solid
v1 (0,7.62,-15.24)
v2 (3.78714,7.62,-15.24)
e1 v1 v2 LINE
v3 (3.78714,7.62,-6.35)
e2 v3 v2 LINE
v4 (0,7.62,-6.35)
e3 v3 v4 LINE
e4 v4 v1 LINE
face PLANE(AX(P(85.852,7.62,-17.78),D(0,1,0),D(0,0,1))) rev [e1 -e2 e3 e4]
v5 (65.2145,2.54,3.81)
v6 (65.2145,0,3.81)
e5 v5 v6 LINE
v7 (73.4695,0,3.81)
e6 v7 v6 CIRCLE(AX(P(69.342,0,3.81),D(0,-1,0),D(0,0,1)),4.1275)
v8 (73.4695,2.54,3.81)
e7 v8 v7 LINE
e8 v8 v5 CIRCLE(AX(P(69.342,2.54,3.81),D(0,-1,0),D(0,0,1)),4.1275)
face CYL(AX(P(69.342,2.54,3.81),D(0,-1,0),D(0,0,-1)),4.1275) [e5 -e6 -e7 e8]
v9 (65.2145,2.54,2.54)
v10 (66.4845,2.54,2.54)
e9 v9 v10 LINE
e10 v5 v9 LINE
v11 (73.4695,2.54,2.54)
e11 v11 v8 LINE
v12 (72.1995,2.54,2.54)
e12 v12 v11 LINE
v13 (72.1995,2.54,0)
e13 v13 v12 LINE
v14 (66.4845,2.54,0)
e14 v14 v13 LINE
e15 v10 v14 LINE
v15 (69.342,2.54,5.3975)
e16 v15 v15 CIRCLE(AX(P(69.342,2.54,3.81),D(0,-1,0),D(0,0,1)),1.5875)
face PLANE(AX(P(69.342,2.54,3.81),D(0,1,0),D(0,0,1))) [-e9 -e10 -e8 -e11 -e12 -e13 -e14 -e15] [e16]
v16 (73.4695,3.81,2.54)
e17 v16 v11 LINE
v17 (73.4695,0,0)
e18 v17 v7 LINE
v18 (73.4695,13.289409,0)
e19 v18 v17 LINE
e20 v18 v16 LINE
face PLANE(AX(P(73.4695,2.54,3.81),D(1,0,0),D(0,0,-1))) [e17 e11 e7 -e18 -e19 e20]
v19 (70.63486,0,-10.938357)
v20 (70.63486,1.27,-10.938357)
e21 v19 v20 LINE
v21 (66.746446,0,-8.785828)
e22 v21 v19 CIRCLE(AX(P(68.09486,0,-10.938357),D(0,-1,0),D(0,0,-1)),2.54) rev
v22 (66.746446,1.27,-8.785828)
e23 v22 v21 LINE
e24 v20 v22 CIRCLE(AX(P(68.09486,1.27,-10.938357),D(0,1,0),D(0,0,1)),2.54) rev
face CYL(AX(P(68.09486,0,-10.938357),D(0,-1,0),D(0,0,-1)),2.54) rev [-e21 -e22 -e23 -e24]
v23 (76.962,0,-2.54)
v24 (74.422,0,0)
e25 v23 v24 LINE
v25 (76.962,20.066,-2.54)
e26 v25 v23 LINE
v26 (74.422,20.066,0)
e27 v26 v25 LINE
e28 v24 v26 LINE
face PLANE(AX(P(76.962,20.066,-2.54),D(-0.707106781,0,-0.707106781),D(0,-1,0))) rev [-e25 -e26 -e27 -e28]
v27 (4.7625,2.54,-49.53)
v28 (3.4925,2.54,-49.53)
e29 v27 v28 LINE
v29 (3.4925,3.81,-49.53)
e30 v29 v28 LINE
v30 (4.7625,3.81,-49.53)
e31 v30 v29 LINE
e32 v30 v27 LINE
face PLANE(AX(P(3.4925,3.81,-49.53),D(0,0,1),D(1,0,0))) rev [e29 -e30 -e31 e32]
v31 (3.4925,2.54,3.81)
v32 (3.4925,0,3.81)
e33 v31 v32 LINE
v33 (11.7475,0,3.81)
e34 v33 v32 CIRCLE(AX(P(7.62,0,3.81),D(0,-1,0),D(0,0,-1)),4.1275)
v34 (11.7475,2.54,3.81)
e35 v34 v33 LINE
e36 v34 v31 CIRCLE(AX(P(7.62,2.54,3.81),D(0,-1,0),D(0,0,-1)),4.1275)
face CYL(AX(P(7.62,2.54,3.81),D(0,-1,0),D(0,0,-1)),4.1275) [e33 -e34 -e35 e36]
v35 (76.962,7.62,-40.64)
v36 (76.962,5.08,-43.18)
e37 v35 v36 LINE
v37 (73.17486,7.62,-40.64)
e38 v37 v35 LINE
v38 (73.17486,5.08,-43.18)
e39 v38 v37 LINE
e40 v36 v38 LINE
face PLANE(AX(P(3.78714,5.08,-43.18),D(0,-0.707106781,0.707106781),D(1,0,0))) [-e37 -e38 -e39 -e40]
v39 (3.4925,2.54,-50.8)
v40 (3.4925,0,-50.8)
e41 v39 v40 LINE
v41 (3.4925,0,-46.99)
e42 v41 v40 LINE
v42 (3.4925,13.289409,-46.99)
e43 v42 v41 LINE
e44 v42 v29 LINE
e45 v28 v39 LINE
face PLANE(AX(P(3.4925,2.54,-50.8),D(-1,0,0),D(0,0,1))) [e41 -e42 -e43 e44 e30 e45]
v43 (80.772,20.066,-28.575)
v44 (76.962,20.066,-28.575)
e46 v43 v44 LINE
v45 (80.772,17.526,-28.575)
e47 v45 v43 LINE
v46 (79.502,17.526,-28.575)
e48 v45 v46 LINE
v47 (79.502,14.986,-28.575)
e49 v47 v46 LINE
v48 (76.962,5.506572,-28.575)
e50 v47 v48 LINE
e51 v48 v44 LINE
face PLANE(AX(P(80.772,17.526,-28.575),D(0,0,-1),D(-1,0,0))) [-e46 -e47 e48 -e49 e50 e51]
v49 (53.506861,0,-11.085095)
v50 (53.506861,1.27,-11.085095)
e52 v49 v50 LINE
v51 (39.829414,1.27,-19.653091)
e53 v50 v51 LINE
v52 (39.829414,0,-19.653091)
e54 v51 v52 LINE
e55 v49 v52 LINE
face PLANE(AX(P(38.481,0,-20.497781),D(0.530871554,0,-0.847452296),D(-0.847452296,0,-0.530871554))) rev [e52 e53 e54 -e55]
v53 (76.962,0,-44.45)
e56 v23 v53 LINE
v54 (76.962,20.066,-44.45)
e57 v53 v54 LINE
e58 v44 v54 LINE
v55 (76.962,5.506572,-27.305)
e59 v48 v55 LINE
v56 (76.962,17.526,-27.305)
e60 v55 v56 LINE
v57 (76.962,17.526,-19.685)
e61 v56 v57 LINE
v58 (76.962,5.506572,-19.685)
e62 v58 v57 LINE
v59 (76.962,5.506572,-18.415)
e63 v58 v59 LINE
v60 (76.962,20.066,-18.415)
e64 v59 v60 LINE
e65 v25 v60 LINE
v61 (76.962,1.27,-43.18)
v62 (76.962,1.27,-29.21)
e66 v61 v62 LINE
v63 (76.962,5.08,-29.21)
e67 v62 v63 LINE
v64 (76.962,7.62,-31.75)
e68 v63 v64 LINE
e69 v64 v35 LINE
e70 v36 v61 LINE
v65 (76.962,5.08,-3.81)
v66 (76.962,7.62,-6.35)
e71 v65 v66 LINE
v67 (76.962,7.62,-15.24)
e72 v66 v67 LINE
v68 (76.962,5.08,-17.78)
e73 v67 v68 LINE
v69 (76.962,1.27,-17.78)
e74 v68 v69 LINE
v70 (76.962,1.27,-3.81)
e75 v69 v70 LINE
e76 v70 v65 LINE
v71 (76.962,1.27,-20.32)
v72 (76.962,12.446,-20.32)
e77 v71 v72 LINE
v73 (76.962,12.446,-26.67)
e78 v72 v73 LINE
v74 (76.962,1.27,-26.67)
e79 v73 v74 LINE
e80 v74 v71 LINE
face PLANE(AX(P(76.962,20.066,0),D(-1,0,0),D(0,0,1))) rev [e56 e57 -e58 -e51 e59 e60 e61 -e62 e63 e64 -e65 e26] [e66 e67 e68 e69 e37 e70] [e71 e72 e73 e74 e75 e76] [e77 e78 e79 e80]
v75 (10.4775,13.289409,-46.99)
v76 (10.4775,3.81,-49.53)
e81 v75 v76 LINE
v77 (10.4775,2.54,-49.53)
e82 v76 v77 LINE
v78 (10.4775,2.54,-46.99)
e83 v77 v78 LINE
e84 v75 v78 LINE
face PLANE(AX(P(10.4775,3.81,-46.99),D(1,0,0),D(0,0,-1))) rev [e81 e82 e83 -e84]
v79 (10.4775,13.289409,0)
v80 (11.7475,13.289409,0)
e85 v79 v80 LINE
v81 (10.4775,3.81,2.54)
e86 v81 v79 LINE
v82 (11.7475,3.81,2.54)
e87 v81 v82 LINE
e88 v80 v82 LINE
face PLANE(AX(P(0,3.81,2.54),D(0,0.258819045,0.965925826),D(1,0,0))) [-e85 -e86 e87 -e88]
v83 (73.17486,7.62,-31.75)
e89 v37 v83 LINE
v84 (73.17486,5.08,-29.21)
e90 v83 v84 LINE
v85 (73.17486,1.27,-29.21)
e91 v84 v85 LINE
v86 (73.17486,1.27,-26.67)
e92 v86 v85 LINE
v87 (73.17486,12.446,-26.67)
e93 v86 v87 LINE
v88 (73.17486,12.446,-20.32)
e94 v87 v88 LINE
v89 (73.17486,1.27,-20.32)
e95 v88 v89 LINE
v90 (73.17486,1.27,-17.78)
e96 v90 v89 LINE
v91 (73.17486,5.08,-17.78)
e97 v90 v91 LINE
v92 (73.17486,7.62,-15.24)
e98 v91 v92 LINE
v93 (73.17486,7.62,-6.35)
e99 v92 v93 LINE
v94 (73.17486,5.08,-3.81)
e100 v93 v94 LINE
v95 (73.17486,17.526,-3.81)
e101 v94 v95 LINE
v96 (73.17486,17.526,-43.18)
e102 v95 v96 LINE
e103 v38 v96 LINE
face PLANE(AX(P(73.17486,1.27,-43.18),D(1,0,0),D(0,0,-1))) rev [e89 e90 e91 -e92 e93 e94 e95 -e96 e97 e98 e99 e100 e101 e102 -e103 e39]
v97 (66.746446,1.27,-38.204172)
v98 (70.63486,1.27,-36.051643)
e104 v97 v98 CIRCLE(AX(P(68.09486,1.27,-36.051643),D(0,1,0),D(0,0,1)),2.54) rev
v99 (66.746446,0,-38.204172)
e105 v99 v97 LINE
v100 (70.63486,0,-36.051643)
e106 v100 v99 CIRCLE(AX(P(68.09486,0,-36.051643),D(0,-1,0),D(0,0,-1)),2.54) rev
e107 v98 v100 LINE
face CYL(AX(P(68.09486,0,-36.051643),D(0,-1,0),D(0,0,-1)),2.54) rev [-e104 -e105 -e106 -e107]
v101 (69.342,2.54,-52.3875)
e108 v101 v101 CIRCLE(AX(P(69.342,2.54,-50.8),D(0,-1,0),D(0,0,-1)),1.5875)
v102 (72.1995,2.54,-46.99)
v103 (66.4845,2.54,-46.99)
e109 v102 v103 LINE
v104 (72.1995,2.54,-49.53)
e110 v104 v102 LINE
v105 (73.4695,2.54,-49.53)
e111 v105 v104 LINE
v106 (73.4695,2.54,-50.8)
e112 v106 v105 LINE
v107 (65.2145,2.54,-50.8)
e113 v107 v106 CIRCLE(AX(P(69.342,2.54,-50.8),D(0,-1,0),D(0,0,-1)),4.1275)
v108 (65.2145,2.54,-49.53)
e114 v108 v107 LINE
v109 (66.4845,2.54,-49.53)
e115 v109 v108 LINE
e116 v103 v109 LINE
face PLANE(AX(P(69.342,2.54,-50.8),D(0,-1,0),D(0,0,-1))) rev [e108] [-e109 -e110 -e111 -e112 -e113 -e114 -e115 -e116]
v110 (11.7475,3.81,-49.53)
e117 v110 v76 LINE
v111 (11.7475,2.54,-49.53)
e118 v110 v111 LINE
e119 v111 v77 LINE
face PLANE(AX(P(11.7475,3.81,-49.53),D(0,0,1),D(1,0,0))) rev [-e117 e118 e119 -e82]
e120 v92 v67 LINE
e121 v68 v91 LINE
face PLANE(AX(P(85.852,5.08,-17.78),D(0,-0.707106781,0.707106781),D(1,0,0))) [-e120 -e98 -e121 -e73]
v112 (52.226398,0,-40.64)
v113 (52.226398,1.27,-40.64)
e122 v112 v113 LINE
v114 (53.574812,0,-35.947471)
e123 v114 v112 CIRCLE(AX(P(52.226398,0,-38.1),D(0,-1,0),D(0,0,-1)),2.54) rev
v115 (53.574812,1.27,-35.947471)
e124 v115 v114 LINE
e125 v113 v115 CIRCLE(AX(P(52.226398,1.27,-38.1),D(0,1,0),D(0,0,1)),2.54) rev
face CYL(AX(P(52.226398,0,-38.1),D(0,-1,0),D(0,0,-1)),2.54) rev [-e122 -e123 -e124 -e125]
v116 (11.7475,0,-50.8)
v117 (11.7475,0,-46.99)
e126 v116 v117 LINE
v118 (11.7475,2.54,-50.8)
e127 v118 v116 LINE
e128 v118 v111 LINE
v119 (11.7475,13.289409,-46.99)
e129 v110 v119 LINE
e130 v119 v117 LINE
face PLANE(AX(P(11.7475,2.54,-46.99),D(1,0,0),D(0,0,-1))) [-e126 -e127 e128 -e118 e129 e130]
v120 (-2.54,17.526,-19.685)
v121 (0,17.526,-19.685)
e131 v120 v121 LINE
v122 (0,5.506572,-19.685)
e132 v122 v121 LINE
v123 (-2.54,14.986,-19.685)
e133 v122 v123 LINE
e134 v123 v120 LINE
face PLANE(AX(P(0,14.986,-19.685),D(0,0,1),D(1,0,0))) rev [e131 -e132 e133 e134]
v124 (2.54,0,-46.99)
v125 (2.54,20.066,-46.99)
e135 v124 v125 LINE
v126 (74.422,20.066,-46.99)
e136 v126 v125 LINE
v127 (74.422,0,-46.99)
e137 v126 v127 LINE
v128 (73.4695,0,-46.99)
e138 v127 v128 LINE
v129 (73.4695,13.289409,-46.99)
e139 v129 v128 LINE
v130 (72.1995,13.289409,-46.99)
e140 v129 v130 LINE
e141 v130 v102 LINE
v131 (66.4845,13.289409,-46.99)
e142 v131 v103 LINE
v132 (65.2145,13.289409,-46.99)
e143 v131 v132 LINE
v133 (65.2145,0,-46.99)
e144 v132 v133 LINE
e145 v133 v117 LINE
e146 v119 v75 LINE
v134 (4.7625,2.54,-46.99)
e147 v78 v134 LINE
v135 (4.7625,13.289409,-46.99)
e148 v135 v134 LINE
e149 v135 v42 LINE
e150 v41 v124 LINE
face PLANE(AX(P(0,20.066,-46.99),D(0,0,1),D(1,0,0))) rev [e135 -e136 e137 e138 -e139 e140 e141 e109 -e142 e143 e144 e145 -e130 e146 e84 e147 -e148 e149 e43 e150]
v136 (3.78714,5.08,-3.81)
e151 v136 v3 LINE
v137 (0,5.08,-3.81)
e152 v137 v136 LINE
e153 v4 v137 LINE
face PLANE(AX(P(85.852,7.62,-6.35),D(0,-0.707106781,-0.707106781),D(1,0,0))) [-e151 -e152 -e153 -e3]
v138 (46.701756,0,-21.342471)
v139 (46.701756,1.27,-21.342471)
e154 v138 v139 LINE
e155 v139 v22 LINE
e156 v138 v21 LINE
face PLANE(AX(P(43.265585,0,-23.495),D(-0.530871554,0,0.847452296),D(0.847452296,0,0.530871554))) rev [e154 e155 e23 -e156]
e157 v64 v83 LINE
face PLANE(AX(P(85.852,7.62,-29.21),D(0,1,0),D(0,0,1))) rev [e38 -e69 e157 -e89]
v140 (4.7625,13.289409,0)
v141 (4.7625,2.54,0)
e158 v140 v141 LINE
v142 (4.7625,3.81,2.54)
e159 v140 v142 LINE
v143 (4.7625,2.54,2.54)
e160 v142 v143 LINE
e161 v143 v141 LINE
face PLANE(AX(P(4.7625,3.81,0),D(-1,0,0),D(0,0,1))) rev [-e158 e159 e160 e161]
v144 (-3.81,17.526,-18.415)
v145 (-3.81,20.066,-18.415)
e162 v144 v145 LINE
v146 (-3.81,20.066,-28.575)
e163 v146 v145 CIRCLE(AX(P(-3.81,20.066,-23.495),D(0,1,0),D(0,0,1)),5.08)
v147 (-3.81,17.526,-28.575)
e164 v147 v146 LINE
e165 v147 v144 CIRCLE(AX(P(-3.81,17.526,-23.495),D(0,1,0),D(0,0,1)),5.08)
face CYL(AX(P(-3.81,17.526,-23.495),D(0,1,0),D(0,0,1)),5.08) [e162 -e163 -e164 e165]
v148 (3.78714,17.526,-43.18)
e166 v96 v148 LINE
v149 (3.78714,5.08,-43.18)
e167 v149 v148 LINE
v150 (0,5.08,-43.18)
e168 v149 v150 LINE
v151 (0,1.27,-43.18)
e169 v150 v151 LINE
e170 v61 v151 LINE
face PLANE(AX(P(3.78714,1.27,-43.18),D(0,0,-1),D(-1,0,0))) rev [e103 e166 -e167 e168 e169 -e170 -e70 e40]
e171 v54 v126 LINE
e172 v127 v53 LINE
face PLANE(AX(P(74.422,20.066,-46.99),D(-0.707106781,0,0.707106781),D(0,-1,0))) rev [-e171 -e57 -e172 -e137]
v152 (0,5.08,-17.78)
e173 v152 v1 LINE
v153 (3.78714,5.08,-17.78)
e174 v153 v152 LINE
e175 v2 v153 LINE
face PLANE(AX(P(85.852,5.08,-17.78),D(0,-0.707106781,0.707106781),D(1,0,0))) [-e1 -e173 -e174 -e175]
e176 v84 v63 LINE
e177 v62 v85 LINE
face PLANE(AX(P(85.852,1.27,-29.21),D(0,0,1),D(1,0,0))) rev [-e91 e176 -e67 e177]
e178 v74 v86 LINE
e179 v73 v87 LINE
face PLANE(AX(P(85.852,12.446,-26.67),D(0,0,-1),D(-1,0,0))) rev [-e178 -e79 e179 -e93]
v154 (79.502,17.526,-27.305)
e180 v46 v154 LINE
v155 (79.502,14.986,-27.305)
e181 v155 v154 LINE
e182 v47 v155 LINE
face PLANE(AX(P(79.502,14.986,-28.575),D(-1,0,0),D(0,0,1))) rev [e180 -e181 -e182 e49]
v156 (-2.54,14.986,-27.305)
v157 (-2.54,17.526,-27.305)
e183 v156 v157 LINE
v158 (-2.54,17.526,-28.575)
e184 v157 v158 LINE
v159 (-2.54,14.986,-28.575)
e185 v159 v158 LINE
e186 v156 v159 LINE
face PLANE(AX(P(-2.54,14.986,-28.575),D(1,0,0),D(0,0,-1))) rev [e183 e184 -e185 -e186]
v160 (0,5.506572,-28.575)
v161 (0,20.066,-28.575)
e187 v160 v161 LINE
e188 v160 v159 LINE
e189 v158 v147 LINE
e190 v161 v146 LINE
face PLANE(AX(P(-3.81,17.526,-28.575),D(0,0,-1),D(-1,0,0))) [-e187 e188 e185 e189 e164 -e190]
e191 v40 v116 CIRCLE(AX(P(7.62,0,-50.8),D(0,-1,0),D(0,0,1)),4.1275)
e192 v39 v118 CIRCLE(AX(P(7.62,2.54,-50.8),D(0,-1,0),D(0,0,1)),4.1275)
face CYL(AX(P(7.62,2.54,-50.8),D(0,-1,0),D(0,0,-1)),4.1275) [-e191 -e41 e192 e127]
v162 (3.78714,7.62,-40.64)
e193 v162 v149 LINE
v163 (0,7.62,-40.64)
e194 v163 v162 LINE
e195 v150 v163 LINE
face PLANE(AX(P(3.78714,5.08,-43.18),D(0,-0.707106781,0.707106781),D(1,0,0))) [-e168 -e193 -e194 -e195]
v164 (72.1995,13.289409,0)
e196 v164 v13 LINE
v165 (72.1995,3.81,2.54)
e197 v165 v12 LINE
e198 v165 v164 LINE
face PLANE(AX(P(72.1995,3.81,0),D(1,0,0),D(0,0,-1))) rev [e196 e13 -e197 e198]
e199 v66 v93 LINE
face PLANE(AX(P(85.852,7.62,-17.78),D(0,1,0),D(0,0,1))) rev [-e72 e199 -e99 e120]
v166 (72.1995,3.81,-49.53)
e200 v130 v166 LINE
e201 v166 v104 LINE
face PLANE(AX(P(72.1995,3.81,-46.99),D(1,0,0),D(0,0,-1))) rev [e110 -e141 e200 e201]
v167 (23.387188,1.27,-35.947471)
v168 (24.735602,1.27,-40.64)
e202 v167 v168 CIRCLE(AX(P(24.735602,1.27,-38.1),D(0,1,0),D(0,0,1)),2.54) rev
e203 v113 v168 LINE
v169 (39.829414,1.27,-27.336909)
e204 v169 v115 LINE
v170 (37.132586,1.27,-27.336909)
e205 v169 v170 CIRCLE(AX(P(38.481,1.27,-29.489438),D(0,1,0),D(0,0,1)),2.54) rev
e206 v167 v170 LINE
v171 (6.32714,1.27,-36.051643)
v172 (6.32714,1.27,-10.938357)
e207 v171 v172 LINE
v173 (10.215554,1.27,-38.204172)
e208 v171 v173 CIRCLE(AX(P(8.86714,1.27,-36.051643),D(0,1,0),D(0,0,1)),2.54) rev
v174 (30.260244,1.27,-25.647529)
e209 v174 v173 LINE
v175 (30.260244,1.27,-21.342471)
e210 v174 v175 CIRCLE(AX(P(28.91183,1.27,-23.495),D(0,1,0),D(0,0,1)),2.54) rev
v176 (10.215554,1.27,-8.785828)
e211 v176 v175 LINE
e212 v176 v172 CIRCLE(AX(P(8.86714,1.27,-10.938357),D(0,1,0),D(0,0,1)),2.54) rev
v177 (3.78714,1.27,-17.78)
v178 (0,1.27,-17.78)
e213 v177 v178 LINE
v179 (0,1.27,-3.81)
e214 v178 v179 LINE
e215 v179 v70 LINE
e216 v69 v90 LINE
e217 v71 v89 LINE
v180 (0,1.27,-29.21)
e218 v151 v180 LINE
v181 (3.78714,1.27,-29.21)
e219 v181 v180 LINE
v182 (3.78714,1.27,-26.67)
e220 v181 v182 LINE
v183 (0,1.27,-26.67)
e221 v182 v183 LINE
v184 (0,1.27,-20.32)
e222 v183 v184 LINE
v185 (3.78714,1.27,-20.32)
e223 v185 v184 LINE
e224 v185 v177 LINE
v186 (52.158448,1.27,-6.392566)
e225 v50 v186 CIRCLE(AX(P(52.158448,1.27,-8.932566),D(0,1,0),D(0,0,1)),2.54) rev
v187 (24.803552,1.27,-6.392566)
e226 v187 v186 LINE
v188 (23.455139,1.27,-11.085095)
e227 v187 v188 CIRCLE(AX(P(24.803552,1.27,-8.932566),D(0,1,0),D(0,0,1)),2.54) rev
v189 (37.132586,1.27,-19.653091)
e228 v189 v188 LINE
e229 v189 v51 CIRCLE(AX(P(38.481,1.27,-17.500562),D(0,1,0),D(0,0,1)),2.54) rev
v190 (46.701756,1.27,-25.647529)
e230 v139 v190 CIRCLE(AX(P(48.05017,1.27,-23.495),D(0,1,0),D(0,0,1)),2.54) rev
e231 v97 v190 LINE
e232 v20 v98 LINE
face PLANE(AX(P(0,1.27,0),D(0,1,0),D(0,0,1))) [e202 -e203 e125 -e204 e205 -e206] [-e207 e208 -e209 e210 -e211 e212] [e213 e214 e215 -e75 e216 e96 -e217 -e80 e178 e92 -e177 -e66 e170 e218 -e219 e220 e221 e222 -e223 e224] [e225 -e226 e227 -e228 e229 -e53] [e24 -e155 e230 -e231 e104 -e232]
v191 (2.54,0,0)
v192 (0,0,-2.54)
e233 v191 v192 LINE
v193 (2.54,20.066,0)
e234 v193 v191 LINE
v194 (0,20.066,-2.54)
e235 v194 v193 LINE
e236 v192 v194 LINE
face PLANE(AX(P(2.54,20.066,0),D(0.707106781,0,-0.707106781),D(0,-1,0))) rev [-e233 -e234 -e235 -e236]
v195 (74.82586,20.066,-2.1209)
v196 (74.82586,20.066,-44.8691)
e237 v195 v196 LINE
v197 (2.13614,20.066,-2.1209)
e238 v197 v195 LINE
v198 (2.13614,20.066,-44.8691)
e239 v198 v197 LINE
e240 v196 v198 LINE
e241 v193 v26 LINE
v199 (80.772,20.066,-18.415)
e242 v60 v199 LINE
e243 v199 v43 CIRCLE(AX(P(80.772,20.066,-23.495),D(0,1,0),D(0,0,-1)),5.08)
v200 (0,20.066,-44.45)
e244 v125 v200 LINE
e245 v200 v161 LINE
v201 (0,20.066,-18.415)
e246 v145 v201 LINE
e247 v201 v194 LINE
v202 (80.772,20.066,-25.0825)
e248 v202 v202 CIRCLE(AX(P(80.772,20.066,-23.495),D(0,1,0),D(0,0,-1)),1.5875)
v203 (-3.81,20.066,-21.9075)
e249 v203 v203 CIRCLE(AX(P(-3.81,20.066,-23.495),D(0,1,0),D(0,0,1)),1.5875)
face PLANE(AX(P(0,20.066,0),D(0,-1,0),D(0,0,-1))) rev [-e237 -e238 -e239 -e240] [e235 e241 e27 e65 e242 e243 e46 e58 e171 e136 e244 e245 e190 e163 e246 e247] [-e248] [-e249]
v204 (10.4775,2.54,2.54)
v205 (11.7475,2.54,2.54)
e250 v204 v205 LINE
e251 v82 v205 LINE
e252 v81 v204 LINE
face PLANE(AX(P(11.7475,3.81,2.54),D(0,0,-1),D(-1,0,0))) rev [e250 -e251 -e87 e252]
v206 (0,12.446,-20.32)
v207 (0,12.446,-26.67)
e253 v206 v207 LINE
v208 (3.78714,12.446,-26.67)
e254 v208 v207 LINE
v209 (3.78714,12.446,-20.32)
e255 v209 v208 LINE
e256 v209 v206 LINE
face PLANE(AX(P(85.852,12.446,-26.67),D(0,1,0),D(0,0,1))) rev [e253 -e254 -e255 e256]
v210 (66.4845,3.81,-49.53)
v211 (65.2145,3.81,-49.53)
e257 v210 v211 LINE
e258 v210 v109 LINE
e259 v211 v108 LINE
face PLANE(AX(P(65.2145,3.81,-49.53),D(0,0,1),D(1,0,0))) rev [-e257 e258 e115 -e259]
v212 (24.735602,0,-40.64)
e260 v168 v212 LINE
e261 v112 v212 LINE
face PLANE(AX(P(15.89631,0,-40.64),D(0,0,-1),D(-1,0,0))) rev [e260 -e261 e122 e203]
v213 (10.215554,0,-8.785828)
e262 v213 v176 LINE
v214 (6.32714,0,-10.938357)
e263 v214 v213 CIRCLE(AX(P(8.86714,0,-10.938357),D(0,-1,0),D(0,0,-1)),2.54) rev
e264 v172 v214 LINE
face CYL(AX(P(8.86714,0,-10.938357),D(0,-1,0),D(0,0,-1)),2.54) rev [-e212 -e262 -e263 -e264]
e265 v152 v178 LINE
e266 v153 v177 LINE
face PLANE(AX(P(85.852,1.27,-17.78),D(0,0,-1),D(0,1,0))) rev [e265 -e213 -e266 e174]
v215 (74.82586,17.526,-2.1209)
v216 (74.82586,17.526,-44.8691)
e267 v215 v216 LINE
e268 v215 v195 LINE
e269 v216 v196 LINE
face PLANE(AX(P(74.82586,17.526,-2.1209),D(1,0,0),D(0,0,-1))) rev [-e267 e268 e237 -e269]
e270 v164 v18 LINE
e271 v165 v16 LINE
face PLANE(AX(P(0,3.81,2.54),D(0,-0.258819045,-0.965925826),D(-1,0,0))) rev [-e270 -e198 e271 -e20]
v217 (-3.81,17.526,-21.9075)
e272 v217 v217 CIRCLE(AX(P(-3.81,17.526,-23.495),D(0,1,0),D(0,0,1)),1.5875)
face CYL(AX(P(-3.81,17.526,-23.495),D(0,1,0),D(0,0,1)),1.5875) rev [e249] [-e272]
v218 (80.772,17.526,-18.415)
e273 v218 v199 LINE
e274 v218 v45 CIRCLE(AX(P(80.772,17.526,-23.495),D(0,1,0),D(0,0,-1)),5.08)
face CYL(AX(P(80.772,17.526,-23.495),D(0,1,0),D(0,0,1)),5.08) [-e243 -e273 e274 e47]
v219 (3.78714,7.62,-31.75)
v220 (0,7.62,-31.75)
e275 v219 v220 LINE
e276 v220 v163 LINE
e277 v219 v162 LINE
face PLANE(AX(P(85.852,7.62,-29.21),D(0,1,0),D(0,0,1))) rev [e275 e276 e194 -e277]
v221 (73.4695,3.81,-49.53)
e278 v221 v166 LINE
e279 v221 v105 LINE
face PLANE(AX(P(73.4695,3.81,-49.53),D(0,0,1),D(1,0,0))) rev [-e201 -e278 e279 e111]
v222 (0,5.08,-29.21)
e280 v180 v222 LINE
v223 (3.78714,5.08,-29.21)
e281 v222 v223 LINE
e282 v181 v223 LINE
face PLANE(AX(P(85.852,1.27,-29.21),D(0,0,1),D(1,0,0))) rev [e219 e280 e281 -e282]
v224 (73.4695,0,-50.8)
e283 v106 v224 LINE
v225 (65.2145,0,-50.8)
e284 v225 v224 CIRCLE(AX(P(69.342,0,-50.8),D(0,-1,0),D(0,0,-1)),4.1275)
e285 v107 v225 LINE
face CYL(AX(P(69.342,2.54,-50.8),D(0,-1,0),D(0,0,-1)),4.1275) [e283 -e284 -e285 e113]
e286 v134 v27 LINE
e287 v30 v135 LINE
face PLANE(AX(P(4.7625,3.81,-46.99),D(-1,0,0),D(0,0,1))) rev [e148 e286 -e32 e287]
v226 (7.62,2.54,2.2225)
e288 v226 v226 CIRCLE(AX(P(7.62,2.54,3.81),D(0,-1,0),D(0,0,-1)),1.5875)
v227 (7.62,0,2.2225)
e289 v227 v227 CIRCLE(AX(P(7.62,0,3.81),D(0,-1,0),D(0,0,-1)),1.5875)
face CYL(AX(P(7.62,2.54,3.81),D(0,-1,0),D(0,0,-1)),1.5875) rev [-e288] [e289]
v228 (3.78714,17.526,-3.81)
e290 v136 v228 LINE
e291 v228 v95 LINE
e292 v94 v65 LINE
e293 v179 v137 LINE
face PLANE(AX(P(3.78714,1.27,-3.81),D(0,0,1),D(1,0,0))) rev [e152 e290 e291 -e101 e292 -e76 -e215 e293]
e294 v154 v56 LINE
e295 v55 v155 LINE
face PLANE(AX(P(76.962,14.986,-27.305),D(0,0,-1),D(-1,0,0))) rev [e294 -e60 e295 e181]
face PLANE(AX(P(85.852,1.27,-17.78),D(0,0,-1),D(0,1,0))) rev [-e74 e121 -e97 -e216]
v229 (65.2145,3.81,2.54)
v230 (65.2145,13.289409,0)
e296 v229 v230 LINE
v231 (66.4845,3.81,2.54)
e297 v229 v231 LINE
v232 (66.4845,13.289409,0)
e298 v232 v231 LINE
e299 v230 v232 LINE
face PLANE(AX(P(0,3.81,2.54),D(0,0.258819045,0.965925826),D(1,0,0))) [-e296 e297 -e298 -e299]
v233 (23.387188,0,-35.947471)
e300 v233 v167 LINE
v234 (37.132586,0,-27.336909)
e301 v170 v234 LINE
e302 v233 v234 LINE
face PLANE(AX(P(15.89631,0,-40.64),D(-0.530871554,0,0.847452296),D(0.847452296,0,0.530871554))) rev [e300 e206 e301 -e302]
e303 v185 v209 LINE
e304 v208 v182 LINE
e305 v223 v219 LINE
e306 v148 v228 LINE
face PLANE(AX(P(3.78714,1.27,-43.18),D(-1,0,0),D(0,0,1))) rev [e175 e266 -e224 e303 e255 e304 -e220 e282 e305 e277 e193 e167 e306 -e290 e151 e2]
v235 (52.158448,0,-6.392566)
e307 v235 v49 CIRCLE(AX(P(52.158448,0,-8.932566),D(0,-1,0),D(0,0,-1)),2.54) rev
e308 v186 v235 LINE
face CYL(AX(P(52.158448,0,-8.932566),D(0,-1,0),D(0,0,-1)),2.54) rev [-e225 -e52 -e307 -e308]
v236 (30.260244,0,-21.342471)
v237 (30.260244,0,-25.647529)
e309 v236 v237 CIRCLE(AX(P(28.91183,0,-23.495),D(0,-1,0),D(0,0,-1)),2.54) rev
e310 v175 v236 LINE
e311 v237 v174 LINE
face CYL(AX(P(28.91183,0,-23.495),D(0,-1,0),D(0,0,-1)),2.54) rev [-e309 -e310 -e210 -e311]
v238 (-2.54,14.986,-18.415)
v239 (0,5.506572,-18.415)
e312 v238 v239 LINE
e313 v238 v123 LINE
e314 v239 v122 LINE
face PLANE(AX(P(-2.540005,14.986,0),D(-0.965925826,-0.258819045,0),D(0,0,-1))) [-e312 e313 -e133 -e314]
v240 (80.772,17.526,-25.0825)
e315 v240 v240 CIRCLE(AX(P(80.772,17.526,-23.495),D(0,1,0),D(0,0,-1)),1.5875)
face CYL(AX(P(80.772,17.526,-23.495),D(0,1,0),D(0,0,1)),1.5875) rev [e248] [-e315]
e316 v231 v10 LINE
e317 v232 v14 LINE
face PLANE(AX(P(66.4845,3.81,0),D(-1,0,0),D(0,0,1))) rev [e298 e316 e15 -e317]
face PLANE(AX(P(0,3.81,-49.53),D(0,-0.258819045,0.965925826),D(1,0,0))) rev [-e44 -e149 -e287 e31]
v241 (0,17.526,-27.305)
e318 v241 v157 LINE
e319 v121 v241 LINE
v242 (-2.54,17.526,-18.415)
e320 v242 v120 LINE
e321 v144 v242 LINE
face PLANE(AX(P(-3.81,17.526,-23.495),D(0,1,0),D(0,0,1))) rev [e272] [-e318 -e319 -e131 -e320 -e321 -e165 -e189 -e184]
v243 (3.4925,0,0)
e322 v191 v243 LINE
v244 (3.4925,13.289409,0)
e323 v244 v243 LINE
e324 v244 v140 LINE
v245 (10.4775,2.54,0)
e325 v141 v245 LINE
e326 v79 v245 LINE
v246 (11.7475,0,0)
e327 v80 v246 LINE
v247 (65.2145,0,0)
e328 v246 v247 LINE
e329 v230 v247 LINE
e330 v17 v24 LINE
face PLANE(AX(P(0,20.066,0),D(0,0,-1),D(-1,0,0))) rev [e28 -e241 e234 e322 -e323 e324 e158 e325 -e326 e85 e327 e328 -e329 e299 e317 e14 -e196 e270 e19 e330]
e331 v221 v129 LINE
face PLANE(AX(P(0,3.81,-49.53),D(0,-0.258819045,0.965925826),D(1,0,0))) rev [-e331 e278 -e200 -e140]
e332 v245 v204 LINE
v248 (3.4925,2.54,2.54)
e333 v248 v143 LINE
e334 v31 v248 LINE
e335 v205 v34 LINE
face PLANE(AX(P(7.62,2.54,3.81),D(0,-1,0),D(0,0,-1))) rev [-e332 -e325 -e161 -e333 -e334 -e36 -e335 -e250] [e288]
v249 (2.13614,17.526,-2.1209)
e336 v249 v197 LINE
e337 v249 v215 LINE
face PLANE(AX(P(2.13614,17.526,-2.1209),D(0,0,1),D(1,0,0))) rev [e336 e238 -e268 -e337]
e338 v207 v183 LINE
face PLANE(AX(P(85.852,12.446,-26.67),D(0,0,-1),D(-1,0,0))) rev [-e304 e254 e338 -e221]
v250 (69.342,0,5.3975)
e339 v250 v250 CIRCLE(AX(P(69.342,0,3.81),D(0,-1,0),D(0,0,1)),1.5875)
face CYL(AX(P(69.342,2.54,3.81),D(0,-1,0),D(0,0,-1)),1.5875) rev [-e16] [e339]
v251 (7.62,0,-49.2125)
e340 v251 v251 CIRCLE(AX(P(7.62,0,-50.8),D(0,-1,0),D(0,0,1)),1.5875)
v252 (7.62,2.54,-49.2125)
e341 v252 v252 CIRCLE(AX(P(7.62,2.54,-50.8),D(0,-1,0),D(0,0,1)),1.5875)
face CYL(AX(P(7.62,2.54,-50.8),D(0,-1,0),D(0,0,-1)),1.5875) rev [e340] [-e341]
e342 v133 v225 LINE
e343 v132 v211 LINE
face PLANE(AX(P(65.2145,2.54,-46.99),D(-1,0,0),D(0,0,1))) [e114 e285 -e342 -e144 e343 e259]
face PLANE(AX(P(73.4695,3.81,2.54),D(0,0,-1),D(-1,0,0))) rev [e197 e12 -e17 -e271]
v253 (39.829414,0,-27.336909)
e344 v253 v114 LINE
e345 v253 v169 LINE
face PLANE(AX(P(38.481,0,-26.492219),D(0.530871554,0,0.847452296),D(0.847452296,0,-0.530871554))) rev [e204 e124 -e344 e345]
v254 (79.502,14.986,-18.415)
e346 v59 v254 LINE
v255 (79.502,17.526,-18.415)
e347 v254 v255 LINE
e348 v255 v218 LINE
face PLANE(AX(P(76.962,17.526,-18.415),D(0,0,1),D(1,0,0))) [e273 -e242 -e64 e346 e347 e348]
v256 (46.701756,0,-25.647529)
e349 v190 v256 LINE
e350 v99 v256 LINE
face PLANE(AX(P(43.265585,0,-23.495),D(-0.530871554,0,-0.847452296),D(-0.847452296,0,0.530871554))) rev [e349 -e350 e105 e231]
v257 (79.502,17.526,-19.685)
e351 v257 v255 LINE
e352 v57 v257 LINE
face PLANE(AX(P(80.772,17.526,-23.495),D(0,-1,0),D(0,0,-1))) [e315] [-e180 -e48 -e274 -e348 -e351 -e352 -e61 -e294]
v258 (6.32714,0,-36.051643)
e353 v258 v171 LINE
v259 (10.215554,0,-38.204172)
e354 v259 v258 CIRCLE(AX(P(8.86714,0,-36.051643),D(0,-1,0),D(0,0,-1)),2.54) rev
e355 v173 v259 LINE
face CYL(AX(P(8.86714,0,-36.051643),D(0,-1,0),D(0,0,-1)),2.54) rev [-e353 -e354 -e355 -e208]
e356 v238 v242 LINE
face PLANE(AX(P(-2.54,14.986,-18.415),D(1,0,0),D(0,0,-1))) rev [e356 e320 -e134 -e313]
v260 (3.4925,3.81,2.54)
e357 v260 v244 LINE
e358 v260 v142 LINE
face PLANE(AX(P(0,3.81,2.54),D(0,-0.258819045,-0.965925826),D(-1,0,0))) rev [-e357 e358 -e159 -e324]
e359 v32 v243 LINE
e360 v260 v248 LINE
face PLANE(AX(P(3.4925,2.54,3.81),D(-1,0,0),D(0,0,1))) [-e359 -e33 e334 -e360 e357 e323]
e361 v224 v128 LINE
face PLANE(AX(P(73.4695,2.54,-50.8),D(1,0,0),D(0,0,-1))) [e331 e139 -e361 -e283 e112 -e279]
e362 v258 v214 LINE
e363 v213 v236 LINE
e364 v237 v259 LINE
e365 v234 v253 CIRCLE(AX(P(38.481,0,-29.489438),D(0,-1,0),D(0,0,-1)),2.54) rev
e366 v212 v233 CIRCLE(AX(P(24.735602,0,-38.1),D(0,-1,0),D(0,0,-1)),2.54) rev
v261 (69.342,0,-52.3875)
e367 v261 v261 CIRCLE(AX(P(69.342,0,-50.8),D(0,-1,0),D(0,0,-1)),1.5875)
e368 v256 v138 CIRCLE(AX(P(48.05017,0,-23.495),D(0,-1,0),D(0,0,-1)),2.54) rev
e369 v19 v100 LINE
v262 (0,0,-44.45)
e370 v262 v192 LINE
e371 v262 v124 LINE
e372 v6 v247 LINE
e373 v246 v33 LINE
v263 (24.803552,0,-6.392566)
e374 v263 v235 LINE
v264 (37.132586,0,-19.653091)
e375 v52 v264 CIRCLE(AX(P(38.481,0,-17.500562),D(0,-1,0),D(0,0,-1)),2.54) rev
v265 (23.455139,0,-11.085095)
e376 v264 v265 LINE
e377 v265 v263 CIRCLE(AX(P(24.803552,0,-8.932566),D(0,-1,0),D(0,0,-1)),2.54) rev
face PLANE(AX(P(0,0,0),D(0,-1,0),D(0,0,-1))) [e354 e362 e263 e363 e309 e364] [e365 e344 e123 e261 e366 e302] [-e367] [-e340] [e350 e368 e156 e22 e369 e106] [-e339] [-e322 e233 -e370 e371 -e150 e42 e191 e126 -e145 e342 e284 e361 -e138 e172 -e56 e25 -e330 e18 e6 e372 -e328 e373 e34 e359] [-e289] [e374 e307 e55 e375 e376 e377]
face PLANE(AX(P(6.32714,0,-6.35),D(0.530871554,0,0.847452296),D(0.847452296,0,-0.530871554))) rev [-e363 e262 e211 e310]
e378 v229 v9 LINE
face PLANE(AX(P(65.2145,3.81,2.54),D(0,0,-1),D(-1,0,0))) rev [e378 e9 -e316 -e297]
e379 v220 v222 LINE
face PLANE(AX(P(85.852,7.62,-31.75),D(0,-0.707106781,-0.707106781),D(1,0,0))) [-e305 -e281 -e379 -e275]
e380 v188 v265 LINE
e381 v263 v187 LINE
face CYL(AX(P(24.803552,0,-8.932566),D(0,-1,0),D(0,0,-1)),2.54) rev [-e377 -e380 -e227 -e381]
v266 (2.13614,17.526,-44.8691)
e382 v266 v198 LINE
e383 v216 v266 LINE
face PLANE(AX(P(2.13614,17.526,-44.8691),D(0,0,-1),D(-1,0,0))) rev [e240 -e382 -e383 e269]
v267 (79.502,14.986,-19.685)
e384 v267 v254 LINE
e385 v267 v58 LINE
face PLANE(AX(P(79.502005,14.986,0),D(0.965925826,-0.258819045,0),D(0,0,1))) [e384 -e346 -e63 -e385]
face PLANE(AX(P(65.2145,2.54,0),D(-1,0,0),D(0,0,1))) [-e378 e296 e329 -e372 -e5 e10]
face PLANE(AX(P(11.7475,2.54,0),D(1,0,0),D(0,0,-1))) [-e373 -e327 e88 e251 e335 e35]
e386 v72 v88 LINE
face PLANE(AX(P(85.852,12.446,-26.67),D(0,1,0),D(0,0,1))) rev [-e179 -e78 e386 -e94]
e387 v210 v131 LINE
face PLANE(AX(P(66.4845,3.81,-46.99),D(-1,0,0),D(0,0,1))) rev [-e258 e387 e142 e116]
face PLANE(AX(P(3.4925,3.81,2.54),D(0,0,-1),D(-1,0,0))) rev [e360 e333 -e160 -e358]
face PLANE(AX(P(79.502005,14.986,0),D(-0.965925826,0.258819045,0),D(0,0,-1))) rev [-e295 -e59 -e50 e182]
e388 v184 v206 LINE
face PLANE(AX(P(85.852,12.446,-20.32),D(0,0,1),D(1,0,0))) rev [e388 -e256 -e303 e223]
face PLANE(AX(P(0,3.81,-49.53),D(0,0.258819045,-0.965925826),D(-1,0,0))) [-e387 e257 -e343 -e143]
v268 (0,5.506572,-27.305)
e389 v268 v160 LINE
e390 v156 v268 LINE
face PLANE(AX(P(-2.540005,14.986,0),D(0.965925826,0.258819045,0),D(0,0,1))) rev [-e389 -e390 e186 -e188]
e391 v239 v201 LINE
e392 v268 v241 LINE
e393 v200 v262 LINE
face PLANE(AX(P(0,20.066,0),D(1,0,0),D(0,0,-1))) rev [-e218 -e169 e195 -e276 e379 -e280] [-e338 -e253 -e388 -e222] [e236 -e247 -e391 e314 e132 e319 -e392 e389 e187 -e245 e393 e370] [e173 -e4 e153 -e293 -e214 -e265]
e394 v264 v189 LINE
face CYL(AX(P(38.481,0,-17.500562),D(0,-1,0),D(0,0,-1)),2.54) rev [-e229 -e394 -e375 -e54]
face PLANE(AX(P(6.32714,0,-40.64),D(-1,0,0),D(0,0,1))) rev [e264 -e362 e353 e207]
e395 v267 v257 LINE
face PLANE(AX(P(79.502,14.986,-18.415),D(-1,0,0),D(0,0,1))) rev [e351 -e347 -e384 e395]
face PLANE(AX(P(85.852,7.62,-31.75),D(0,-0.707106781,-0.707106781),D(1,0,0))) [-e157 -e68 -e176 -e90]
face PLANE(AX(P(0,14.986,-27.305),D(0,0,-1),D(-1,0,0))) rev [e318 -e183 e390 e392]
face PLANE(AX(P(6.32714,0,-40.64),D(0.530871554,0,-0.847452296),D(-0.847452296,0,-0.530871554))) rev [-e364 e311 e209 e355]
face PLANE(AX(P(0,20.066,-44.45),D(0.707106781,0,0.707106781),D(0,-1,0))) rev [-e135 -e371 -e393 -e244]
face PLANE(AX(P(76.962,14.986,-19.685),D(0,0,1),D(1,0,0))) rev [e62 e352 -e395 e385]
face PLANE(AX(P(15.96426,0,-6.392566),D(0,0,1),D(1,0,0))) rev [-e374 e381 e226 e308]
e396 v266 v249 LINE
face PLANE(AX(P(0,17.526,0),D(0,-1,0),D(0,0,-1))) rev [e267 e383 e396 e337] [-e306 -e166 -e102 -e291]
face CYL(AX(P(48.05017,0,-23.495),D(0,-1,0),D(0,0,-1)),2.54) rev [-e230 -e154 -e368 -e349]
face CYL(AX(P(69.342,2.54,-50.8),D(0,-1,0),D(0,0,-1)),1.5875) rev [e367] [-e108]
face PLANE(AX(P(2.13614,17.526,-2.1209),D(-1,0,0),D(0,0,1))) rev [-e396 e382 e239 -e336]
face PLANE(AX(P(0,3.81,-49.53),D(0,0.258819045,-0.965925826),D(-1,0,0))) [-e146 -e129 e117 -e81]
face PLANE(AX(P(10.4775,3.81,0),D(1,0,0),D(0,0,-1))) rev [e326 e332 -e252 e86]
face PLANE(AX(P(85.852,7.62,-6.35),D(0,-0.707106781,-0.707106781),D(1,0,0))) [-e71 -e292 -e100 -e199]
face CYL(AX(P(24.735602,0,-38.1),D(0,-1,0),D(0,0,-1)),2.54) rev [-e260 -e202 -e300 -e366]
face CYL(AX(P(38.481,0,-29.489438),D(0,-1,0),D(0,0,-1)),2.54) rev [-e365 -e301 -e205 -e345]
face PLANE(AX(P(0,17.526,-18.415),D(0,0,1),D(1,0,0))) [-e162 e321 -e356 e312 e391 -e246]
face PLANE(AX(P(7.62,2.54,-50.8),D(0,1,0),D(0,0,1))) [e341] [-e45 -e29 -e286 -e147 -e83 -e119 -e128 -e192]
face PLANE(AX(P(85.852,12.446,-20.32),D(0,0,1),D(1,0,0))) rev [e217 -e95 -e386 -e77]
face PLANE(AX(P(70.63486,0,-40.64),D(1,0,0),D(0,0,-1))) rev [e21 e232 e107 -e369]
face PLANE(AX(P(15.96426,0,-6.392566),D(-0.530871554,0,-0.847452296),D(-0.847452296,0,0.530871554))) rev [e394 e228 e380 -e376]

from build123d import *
from OCP.BRepFilletAPI import BRepFilletAPI_MakeChamfer

# Parameters (mm, degrees)
SKETCH1_W           = 76.962
SKETCH1_H           = 46.99
BOSS_EXTRUDE1_DEPTH = 20.066
SKETCH2_W           = 72.68972
SKETCH2_H           = 42.7482
CUT_EXTRUDE1_DEPTH  = 2.54
SKETCH3_W           = 69.38772
SKETCH3_H           = 39.37
CUT_EXTRUDE2_DEPTH  = 16.256
CHAMFER1_SIZE       = 2.54
SKETCH6_R           = 1.5875
BOSS_EXTRUDE2_DEPTH = 2.54
CUT_EXTRUDE5_DEPTH  = 97.402641646
FILLET1_R           = 2.54
SKETCH9_R           = 1.5875
BOSS_EXTRUDE3_DEPTH = 2.54
SKETCH12_W          = 1.27
SKETCH12_H          = 2.54
BOSS_EXTRUDE5_DEPTH = 1.27
CHAMFER4_SIZE       = 2.54
CHAMFER4_SIZE_2     = 9.479409052
SKETCH13_W          = 6.35
SKETCH13_H          = 11.176
SKETCH13_W_2        = 13.97
SKETCH13_H_2        = 6.35
CUT_EXTRUDE7_DEPTH  = 104.876082503
SKETCH14_W          = 2.54
SKETCH14_H          = 1.27
BOSS_EXTRUDE6_DEPTH = 2.54
CHAMFER5_SIZE       = 2.54000495
CHAMFER5_SIZE_2     = 9.479427523
CHAMFER6_SIZE       = 2.54


with BuildPart() as part:
    # Sketch1 → Boss-Extrude1 (new body)
    with BuildSketch(Plane(origin=(0, 0, 0), x_dir=(1, 0, 0), z_dir=(0, 1, 0))):
        with Locations((38.481, 23.495)):
            Rectangle(SKETCH1_W, SKETCH1_H)
    extrude(amount=BOSS_EXTRUDE1_DEPTH)

    # Sketch2 → Cut-Extrude1 (cut)
    with BuildSketch(Plane(origin=(0, 20.066, 0), x_dir=(1, 0, 0), z_dir=(0, 1, 0))):
        with Locations((38.481, 23.495)):
            Rectangle(SKETCH2_W, SKETCH2_H)
    extrude(amount=-CUT_EXTRUDE1_DEPTH, mode=Mode.SUBTRACT)

    # Sketch3 → Cut-Extrude2 (cut)
    with BuildSketch(Plane(origin=(0, 17.526, 0), x_dir=(1, 0, 0), z_dir=(0, 1, 0))):
        with Locations((38.481, 23.495)):
            Rectangle(SKETCH3_W, SKETCH3_H)
    extrude(amount=-CUT_EXTRUDE2_DEPTH, mode=Mode.SUBTRACT)

    # Chamfer1
    chamfer1_edges = [part.edges().sort_by_distance(p)[0] for p in [
        (0, 10.033, -46.99),
        (76.962, 10.033, -46.99),
        (76.962, 10.033, 0),
        (0, 10.033, 0),
    ]]
    chamfer(chamfer1_edges, length=CHAMFER1_SIZE)

    # Sketch6 → Boss-Extrude2 (add)
    # profile 1 of 4: a face of its own
    with BuildSketch(Plane.XZ):
        with BuildLine():
            Line((3.4925, 3.81), (3.4925, 0))
            Line((3.4925, 0), (11.7475, 0))
            Line((11.7475, 0), (11.7475, 3.81))
            ThreePointArc((11.7475, 3.81), (7.62, 7.9375), (3.4925, 3.81))
        make_face()
        with Locations(Location((7.62, 3.81, 0), (0, 0, 270))):
            Circle(SKETCH6_R, mode=Mode.SUBTRACT)
    # profile 2 of 4: a face of its own
    with BuildSketch(Plane.XZ):
        with BuildLine():
            Line((11.7475, -46.99), (11.7475, -50.8))
            ThreePointArc((11.7475, -50.8), (7.62, -54.9275), (3.4925, -50.8))
            Line((3.4925, -50.8), (3.4925, -46.99))
            Line((3.4925, -46.99), (11.7475, -46.99))
        make_face()
        with Locations(Location((7.62, -50.8, 0), (0, 0, 90))):
            Circle(SKETCH6_R, mode=Mode.SUBTRACT)
    # profile 3 of 4: a face of its own
    with BuildSketch(Plane.XZ):
        with BuildLine():
            Line((73.4695, -50.8), (73.4695, -46.99))
            Line((73.4695, -46.99), (65.2145, -46.99))
            Line((65.2145, -46.99), (65.2145, -50.8))
            ThreePointArc((65.2145, -50.8), (69.342, -54.9275), (73.4695, -50.8))
        make_face()
        with Locations(Location((69.342, -50.8, 0), (0, 0, 270))):
            Circle(SKETCH6_R, mode=Mode.SUBTRACT)
    # profile 4 of 4: a face of its own
    with BuildSketch(Plane.XZ):
        with BuildLine():
            Line((65.2145, 0), (65.2145, 3.81))
            ThreePointArc((65.2145, 3.81), (69.342, 7.9375), (73.4695, 3.81))
            Line((73.4695, 3.81), (73.4695, 0))
            Line((73.4695, 0), (65.2145, 0))
        make_face()
        with Locations(Location((69.342, 3.81, 0), (0, 0, 90))):
            Circle(SKETCH6_R, mode=Mode.SUBTRACT)
    extrude(amount=-BOSS_EXTRUDE2_DEPTH)

    # Sketch7 → Cut-Extrude5 (cut, through all)
    with BuildSketch(Plane(origin=(0, 1.27, 0), x_dir=(1, 0, 0), z_dir=(0, 1, 0))):
        Polygon((15.896309728, 40.64), (61.065690272, 40.64), (38.481, 26.492218855), align=None)
        Polygon((6.32714, 40.64), (6.32714, 6.35), (33.696415136, 23.495), align=None)
        Polygon((15.964259965, 6.392566228), (60.997740035, 6.392566228), (38.481, 20.497781145), align=None)
        Polygon((70.63486, 40.64), (70.63486, 6.35), (43.265584864, 23.495), align=None)
    extrude(amount=-CUT_EXTRUDE5_DEPTH, mode=Mode.SUBTRACT)

    # Fillet1
    fillet1_edges = [part.edges().sort_by_distance(p)[0] for p in [
        (61.065690272, 0.635, -40.64),
        (38.481, 0.635, -26.492218855),
        (15.896309728, 0.635, -40.64),
        (15.964259965, 0.635, -6.392566228),
        (38.481, 0.635, -20.497781145),
        (60.997740035, 0.635, -6.392566228),
        (43.265584864, 0.635, -23.495),
        (70.63486, 0.635, -40.64),
        (70.63486, 0.635, -6.35),
        (33.696415136, 0.635, -23.495),
        (6.32714, 0.635, -6.35),
        (6.32714, 0.635, -40.64),
    ]]
    fillet(fillet1_edges, radius=FILLET1_R)

    # Sketch9 → Boss-Extrude3 (add)
    # profile 1 of 2: a face of its own
    with BuildSketch(Plane(origin=(0, 20.066, 0), x_dir=(1, 0, 0), z_dir=(0, 1, 0))):
        with BuildLine():
            Line((-3.81, 28.575), (0, 28.575))
            Line((0, 28.575), (0, 18.415))
            Line((0, 18.415), (-3.81, 18.415))
            ThreePointArc((-3.81, 18.415), (-8.89, 23.495), (-3.81, 28.575))
        make_face()
        with Locations(Location((-3.81, 23.495, 0), (0, 0, 270))):
            Circle(SKETCH9_R, mode=Mode.SUBTRACT)
    # profile 2 of 2: a face of its own
    with BuildSketch(Plane(origin=(0, 20.066, 0), x_dir=(1, 0, 0), z_dir=(0, 1, 0))):
        with BuildLine():
            Line((76.962, 18.415), (80.772, 18.415))
            ThreePointArc((80.772, 18.415), (85.852, 23.495), (80.772, 28.575))
            Line((80.772, 28.575), (76.962, 28.575))
            Line((76.962, 28.575), (76.962, 18.415))
        make_face()
        with Locations(Location((80.772, 23.495, 0), (0, 0, 90))):
            Circle(SKETCH9_R, mode=Mode.SUBTRACT)
    extrude(amount=-BOSS_EXTRUDE3_DEPTH)

    # Sketch12 → Boss-Extrude5 (add)
    with BuildSketch(Plane(origin=(0, 2.54, 0), x_dir=(1, 0, 0), z_dir=(0, 1, 0))):
        with Locations((4.1275, -1.27)):
            Rectangle(SKETCH12_W, SKETCH12_H)
        with Locations((11.1125, -1.27)):
            Rectangle(SKETCH12_W, SKETCH12_H)
        with Locations((11.1125, 48.26)):
            Rectangle(SKETCH12_W, SKETCH12_H)
        with Locations((4.1275, 48.26)):
            Rectangle(SKETCH12_W, SKETCH12_H)
        with Locations((72.8345, 48.26)):
            Rectangle(SKETCH12_W, SKETCH12_H)
        with Locations((65.8495, 48.26)):
            Rectangle(SKETCH12_W, SKETCH12_H)
        with Locations((65.8495, -1.27)):
            Rectangle(SKETCH12_W, SKETCH12_H)
        with Locations((72.8345, -1.27)):
            Rectangle(SKETCH12_W, SKETCH12_H)
    extrude(amount=BOSS_EXTRUDE5_DEPTH)

    # Chamfer4
    chamfer4_edges_1 = [part.edges().sort_by_distance(p)[0] for p in [
        (4.1275, 3.81, -46.99),
    ]]
    chamfer4_side_1 = [part.faces().sort_by_distance(p)[0] for p in [
        (4.1275, 3.81, -47.0408),
    ]]
    chamfer4_edges_2 = [part.edges().sort_by_distance(p)[0] for p in [
        (11.1125, 3.81, -46.99),
    ]]
    chamfer4_side_2 = [part.faces().sort_by_distance(p)[0] for p in [
        (11.1125, 3.81, -47.0408),
    ]]
    chamfer4_edges_3 = [part.edges().sort_by_distance(p)[0] for p in [
        (65.8495, 3.81, -46.99),
    ]]
    chamfer4_side_3 = [part.faces().sort_by_distance(p)[0] for p in [
        (65.8495, 3.81, -47.0408),
    ]]
    chamfer4_edges_4 = [part.edges().sort_by_distance(p)[0] for p in [
        (72.8345, 3.81, -46.99),
    ]]
    chamfer4_side_4 = [part.faces().sort_by_distance(p)[0] for p in [
        (72.8345, 3.81, -47.0408),
    ]]
    chamfer4_edges_5 = [part.edges().sort_by_distance(p)[0] for p in [
        (65.8495, 3.81, 0),
    ]]
    chamfer4_side_5 = [part.faces().sort_by_distance(p)[0] for p in [
        (65.8495, 3.81, 0.0508),
    ]]
    chamfer4_edges_6 = [part.edges().sort_by_distance(p)[0] for p in [
        (72.8345, 3.81, 0),
    ]]
    chamfer4_side_6 = [part.faces().sort_by_distance(p)[0] for p in [
        (72.8345, 3.81, 0.0508),
    ]]
    chamfer4_edges_7 = [part.edges().sort_by_distance(p)[0] for p in [
        (11.1125, 3.81, 0),
    ]]
    chamfer4_side_7 = [part.faces().sort_by_distance(p)[0] for p in [
        (11.1125, 3.81, 0.0508),
    ]]
    chamfer4_edges_8 = [part.edges().sort_by_distance(p)[0] for p in [
        (4.1275, 3.81, 0),
    ]]
    chamfer4_side_8 = [part.faces().sort_by_distance(p)[0] for p in [
        (4.1275, 3.81, 0.0508),
    ]]
    chamfer4 = BRepFilletAPI_MakeChamfer(part.part.solid().wrapped)
    for e in chamfer4_edges_1:
        chamfer4.Add(CHAMFER4_SIZE - 0.0001, CHAMFER4_SIZE_2 - 0.0001, e.wrapped, chamfer4_side_1[0].wrapped)
    for e in chamfer4_edges_2:
        chamfer4.Add(CHAMFER4_SIZE - 0.0001, CHAMFER4_SIZE_2 - 0.0001, e.wrapped, chamfer4_side_2[0].wrapped)
    for e in chamfer4_edges_3:
        chamfer4.Add(CHAMFER4_SIZE - 0.0001, CHAMFER4_SIZE_2 - 0.0001, e.wrapped, chamfer4_side_3[0].wrapped)
    for e in chamfer4_edges_4:
        chamfer4.Add(CHAMFER4_SIZE - 0.0001, CHAMFER4_SIZE_2 - 0.0001, e.wrapped, chamfer4_side_4[0].wrapped)
    for e in chamfer4_edges_5:
        chamfer4.Add(CHAMFER4_SIZE - 0.0001, CHAMFER4_SIZE_2 - 0.0001, e.wrapped, chamfer4_side_5[0].wrapped)
    for e in chamfer4_edges_6:
        chamfer4.Add(CHAMFER4_SIZE - 0.0001, CHAMFER4_SIZE_2 - 0.0001, e.wrapped, chamfer4_side_6[0].wrapped)
    for e in chamfer4_edges_7:
        chamfer4.Add(CHAMFER4_SIZE - 0.0001, CHAMFER4_SIZE_2 - 0.0001, e.wrapped, chamfer4_side_7[0].wrapped)
    for e in chamfer4_edges_8:
        chamfer4.Add(CHAMFER4_SIZE - 0.0001, CHAMFER4_SIZE_2 - 0.0001, e.wrapped, chamfer4_side_8[0].wrapped)
    add(Compound.cast(chamfer4.Shape()), mode=Mode.REPLACE)  # a hair under: the kernel refuses the full size

    # Sketch13 → Cut-Extrude7 (cut, through all)
    with BuildSketch(Plane.ZY):
        with Locations((-23.495, 6.858)):
            Rectangle(SKETCH13_W, SKETCH13_H)
        with Locations((-36.195, 4.445)):
            Rectangle(SKETCH13_W_2, SKETCH13_H_2)
        with Locations((-10.795, 4.445)):
            Rectangle(SKETCH13_W_2, SKETCH13_H_2)
    extrude(amount=-CUT_EXTRUDE7_DEPTH, mode=Mode.SUBTRACT)

    # Sketch14 → Boss-Extrude6 (add)
    with BuildSketch(Plane.XZ.offset(-17.526)):
        with Locations((-1.27, -19.05)):
            Rectangle(SKETCH14_W, SKETCH14_H)
        with Locations((-1.27, -27.94)):
            Rectangle(SKETCH14_W, SKETCH14_H)
        with Locations((78.232, -27.94)):
            Rectangle(SKETCH14_W, SKETCH14_H)
        with Locations((78.232, -19.05)):
            Rectangle(SKETCH14_W, SKETCH14_H)
    extrude(amount=BOSS_EXTRUDE6_DEPTH)

    # Chamfer5
    chamfer5_edges_1 = [part.edges().sort_by_distance(p)[0] for p in [
        (76.962, 14.986, -19.05),
    ]]
    chamfer5_side_1 = [part.faces().sort_by_distance(p)[0] for p in [
        (77.012800099, 14.986, -19.05),
    ]]
    chamfer5_edges_2 = [part.edges().sort_by_distance(p)[0] for p in [
        (76.962, 14.986, -27.94),
    ]]
    chamfer5_side_2 = [part.faces().sort_by_distance(p)[0] for p in [
        (77.012800099, 14.986, -27.94),
    ]]
    chamfer5_edges_3 = [part.edges().sort_by_distance(p)[0] for p in [
        (0, 14.986, -27.94),
    ]]
    chamfer5_side_3 = [part.faces().sort_by_distance(p)[0] for p in [
        (-0.050800099, 14.986, -27.94),
    ]]
    chamfer5_edges_4 = [part.edges().sort_by_distance(p)[0] for p in [
        (0, 14.986, -19.05),
    ]]
    chamfer5_side_4 = [part.faces().sort_by_distance(p)[0] for p in [
        (-0.050800099, 14.986, -19.05),
    ]]
    chamfer5 = BRepFilletAPI_MakeChamfer(part.part.solid().wrapped)
    for e in chamfer5_edges_1:
        chamfer5.Add(CHAMFER5_SIZE - 0.0001, CHAMFER5_SIZE_2 - 0.0001, e.wrapped, chamfer5_side_1[0].wrapped)
    for e in chamfer5_edges_2:
        chamfer5.Add(CHAMFER5_SIZE - 0.0001, CHAMFER5_SIZE_2 - 0.0001, e.wrapped, chamfer5_side_2[0].wrapped)
    for e in chamfer5_edges_3:
        chamfer5.Add(CHAMFER5_SIZE - 0.0001, CHAMFER5_SIZE_2 - 0.0001, e.wrapped, chamfer5_side_3[0].wrapped)
    for e in chamfer5_edges_4:
        chamfer5.Add(CHAMFER5_SIZE - 0.0001, CHAMFER5_SIZE_2 - 0.0001, e.wrapped, chamfer5_side_4[0].wrapped)
    add(Compound.cast(chamfer5.Shape()), mode=Mode.REPLACE)  # a hair under: the kernel refuses the full size

    # Chamfer6
    chamfer6_edges = [part.edges().sort_by_distance(p)[0] for p in [
        (75.06843, 7.62, -43.18),
        (1.89357, 7.62, -43.18),
        (75.06843, 7.62, -29.21),
        (1.89357, 7.62, -29.21),
        (75.06843, 7.62, -17.78),
        (1.89357, 7.62, -17.78),
        (75.06843, 7.62, -3.81),
        (1.89357, 7.62, -3.81),
    ]]
    chamfer(chamfer6_edges, length=CHAMFER6_SIZE)


solid = part.part
